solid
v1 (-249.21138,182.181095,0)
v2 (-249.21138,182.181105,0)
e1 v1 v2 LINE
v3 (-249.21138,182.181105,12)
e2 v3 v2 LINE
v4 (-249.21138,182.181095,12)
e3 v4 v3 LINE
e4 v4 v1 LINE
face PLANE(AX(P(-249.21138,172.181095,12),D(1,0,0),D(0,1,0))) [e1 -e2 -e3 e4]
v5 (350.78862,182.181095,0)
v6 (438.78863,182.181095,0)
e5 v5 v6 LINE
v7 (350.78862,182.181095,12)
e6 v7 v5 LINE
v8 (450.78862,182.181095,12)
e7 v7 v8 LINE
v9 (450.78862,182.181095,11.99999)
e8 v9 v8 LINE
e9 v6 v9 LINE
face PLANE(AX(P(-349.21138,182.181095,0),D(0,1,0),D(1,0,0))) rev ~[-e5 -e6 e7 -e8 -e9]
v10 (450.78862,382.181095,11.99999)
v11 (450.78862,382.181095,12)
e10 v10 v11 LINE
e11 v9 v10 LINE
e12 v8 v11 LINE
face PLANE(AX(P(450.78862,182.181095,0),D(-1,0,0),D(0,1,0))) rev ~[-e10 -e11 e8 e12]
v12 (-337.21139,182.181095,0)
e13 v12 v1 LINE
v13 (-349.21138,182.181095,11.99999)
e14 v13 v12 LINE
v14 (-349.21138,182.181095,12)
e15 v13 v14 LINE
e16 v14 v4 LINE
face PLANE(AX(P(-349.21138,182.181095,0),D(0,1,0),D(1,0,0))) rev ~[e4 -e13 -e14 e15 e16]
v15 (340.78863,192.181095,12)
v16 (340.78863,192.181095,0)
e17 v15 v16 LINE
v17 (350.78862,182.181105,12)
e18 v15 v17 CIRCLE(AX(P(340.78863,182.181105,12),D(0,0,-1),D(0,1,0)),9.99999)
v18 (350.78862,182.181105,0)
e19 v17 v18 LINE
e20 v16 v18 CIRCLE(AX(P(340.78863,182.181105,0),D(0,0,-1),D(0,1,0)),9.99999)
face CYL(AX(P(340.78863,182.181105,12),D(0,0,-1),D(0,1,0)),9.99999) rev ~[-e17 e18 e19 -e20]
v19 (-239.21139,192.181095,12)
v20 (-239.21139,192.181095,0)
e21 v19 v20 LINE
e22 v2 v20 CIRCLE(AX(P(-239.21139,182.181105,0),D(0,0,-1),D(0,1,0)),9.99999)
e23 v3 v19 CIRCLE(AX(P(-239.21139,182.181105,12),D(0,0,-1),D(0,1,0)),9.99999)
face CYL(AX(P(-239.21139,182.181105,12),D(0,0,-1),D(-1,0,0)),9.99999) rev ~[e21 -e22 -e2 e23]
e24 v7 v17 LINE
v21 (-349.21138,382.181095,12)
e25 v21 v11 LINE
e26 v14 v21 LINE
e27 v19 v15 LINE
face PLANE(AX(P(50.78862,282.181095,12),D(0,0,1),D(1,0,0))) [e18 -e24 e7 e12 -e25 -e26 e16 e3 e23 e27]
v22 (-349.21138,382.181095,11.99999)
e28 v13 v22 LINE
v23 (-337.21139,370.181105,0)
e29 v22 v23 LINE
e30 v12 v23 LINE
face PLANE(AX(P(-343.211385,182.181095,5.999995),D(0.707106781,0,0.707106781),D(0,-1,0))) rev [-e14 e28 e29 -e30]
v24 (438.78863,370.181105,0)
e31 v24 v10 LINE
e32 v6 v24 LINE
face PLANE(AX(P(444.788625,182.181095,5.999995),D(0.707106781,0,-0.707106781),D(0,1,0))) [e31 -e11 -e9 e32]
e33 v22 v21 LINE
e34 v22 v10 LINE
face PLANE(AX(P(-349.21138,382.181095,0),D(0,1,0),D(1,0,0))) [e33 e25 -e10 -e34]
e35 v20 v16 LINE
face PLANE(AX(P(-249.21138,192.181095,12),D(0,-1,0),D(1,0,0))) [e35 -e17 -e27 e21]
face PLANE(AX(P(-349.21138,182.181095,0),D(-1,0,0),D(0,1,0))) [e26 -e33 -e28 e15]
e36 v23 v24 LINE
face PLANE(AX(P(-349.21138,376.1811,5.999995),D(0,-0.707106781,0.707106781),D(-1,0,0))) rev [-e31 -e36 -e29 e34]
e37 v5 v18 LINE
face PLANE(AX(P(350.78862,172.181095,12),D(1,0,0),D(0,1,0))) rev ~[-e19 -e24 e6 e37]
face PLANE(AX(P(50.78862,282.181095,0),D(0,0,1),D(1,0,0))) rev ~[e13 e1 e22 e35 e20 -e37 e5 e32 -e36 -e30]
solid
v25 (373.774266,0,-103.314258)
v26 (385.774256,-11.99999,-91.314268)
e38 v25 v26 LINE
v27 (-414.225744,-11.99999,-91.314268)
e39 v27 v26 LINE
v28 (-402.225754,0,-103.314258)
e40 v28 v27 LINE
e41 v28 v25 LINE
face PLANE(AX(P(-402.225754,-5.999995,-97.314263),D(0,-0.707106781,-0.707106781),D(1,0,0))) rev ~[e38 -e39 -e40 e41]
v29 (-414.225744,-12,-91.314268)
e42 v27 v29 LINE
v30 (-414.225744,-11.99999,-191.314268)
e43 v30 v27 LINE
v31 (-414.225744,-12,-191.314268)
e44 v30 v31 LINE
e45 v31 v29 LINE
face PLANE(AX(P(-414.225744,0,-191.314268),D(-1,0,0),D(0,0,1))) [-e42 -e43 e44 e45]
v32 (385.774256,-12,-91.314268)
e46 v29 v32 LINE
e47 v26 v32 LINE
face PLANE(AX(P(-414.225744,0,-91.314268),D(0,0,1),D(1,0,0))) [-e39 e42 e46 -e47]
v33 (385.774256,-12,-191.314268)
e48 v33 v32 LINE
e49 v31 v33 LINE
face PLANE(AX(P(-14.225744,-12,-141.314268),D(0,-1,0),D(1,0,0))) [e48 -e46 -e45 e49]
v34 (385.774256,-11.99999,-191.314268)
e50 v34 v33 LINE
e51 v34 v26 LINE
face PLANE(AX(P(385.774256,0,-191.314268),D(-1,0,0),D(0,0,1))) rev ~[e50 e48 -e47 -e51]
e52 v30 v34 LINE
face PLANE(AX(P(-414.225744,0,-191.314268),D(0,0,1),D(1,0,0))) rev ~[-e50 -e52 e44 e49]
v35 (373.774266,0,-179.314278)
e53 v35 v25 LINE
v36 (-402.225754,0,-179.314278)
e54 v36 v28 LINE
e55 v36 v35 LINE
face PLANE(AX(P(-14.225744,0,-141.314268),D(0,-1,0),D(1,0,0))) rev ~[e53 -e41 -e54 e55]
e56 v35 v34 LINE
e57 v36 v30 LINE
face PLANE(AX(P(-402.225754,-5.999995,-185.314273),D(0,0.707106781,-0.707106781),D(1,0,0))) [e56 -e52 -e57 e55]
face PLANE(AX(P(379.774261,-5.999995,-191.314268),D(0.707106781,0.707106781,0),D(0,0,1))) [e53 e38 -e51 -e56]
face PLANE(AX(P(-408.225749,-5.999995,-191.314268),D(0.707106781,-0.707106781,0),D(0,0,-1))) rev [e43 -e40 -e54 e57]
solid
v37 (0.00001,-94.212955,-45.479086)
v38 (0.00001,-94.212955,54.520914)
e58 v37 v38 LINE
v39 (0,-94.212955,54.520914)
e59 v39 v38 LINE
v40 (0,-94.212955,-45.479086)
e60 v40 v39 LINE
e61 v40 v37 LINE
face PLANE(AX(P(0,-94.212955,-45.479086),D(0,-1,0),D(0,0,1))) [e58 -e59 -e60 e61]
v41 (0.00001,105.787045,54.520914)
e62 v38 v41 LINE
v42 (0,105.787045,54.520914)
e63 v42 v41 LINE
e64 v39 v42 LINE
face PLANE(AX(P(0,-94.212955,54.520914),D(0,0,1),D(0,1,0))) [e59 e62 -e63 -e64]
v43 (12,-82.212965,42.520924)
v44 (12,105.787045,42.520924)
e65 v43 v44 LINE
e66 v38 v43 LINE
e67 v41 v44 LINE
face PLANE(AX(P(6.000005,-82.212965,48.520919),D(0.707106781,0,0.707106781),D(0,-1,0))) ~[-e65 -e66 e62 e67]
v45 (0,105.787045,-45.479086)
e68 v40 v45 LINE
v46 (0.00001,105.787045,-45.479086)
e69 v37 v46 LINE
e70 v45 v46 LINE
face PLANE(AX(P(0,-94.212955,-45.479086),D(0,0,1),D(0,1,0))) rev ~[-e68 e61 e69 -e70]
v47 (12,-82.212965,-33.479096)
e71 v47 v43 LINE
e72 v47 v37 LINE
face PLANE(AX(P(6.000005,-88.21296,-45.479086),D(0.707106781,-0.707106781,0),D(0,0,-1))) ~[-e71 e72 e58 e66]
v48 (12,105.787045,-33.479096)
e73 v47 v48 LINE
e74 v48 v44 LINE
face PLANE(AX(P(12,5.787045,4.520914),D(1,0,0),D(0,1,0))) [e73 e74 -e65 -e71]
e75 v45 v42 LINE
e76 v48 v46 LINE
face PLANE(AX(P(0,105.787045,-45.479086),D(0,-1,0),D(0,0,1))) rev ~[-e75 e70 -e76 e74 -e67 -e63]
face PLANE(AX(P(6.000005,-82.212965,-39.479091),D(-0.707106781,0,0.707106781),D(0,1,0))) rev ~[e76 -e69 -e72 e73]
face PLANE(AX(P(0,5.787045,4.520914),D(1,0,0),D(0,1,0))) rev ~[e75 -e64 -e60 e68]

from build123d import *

# Parameters (mm, degrees)
F0_W      = 800
F0_H      = 100
F1_DEPTH  = 12
F2_W      = 200
F2_H      = 100
F3_DEPTH  = 12
F4_SIZE   = 11.99999
F5_SIZE   = 11.99999
F6_SIZE   = 11.99999
F7_W      = 800
F7_H      = 200
F8_DEPTH  = 12
F9_SIZE   = 11.99999
F10_SIZE  = 11.99999
F11_SIZE  = 11.99999
F12_SIZE  = 11.99999
F13_SIZE  = 11.99999
F14_SIZE  = 11.99999
F15_SIZE  = 11.99999
F16_W     = 600
F16_H     = 20
F17_DEPTH = 25
F18_R     = 9.99999
F19_R     = 9.99999


# Not quite as in the source:
# - a fillet or chamfer is up to 0.001 mm smaller than in the source, because OpenCascade refuses the exact size


with BuildPart() as f1:
    # F0 (on Front) → F1 (new body)
    with BuildSketch(Plane.XZ):
        with Locations((-14.225743711, -141.3142682277)):
            Rectangle(F0_W, F0_H)
    extrude(amount=F1_DEPTH)

    # F5 (size 12 in the source; OpenCascade refuses exactly that, so slightly less here)
    f5_edges = [f1.edges().sort_by_distance(p)[0] for p in [
        (-414.225744, 0, -141.314268),
    ]]
    chamfer(f5_edges, length=F5_SIZE)

    # F6 (size 12 in the source; OpenCascade refuses exactly that, so slightly less here)
    f6_edges = [f1.edges().sort_by_distance(p)[0] for p in [
        (385.774256, 0, -141.314268),
    ]]
    chamfer(f6_edges, length=F6_SIZE)

    # F9 (size 12 in the source; OpenCascade refuses exactly that, so slightly less here)
    f9_edges = [f1.edges().sort_by_distance(p)[0] for p in [
        (-14.225744, 0, -91.314268),
    ]]
    chamfer(f9_edges, length=F9_SIZE)

    # F10 (size 12 in the source; OpenCascade refuses exactly that, so slightly less here)
    f10_edges = [f1.edges().sort_by_distance(p)[0] for p in [
        (-14.225744, 0, -191.314268),
    ]]
    chamfer(f10_edges, length=F10_SIZE)


with BuildPart() as f3:
    # F2 (on Right) → F3 (new body)
    with BuildSketch(Plane.YZ):
        with Locations((5.7870447636, 4.5209136379)):
            Rectangle(F2_W, F2_H)
    extrude(amount=F3_DEPTH)

    # F4 (size 12 in the source; OpenCascade refuses exactly that, so slightly less here)
    f4_edges = [f3.edges().sort_by_distance(p)[0] for p in [
        (12, -94.212955, 4.520914),
    ]]
    chamfer(f4_edges, length=F4_SIZE)

    # F14 (size 12 in the source; OpenCascade refuses exactly that, so slightly less here)
    f14_edges = [f3.edges().sort_by_distance(p)[0] for p in [
        (12, 11.78704, 54.520914),
    ]]
    chamfer(f14_edges, length=F14_SIZE)

    # F15 (size 12 in the source; OpenCascade refuses exactly that, so slightly less here)
    f15_edges = [f3.edges().sort_by_distance(p)[0] for p in [
        (12, 11.78704, -45.479086),
    ]]
    chamfer(f15_edges, length=F15_SIZE)


with BuildPart() as f8:
    # F7 (on Top) → F8 (new body)
    with BuildSketch(Plane.XY):
        with Locations((50.7886199192, 282.1810945868)):
            Rectangle(F7_W, F7_H)
    extrude(amount=F8_DEPTH)

    # F11 (size 12 in the source; OpenCascade refuses exactly that, so slightly less here)
    f11_edges = [f8.edges().sort_by_distance(p)[0] for p in [
        (50.78862, 382.181095, 0),
    ]]
    chamfer(f11_edges, length=F11_SIZE)

    # F12 (size 12 in the source; OpenCascade refuses exactly that, so slightly less here)
    f12_edges = [f8.edges().sort_by_distance(p)[0] for p in [
        (-349.21138, 276.1811, 0),
    ]]
    chamfer(f12_edges, length=F12_SIZE)

    # F13 (size 12 in the source; OpenCascade refuses exactly that, so slightly less here)
    f13_edges = [f8.edges().sort_by_distance(p)[0] for p in [
        (450.78862, 276.1811, 0),
    ]]
    chamfer(f13_edges, length=F13_SIZE)

    # F16 (on face) → F17 (cut)
    with BuildSketch(Plane.XY.offset(12)):
        with Locations((50.7886199192, 182.1810945868)):
            Rectangle(F16_W, F16_H)
    extrude(amount=-F17_DEPTH, mode=Mode.SUBTRACT)

    # F18 (radius 10 in the source; OpenCascade refuses exactly that, so slightly less here)
    f18_edges = [f8.edges().sort_by_distance(p)[0] for p in [
        (-249.21138, 192.181095, 6),
    ]]
    fillet(f18_edges, radius=F18_R)

    # F19 (radius 10 in the source; OpenCascade refuses exactly that, so slightly less here)
    f19_edges = [f8.edges().sort_by_distance(p)[0] for p in [
        (350.78862, 192.181095, 6),
    ]]
    fillet(f19_edges, radius=F19_R)


solid = Compound([f1.part, f3.part, f8.part])
